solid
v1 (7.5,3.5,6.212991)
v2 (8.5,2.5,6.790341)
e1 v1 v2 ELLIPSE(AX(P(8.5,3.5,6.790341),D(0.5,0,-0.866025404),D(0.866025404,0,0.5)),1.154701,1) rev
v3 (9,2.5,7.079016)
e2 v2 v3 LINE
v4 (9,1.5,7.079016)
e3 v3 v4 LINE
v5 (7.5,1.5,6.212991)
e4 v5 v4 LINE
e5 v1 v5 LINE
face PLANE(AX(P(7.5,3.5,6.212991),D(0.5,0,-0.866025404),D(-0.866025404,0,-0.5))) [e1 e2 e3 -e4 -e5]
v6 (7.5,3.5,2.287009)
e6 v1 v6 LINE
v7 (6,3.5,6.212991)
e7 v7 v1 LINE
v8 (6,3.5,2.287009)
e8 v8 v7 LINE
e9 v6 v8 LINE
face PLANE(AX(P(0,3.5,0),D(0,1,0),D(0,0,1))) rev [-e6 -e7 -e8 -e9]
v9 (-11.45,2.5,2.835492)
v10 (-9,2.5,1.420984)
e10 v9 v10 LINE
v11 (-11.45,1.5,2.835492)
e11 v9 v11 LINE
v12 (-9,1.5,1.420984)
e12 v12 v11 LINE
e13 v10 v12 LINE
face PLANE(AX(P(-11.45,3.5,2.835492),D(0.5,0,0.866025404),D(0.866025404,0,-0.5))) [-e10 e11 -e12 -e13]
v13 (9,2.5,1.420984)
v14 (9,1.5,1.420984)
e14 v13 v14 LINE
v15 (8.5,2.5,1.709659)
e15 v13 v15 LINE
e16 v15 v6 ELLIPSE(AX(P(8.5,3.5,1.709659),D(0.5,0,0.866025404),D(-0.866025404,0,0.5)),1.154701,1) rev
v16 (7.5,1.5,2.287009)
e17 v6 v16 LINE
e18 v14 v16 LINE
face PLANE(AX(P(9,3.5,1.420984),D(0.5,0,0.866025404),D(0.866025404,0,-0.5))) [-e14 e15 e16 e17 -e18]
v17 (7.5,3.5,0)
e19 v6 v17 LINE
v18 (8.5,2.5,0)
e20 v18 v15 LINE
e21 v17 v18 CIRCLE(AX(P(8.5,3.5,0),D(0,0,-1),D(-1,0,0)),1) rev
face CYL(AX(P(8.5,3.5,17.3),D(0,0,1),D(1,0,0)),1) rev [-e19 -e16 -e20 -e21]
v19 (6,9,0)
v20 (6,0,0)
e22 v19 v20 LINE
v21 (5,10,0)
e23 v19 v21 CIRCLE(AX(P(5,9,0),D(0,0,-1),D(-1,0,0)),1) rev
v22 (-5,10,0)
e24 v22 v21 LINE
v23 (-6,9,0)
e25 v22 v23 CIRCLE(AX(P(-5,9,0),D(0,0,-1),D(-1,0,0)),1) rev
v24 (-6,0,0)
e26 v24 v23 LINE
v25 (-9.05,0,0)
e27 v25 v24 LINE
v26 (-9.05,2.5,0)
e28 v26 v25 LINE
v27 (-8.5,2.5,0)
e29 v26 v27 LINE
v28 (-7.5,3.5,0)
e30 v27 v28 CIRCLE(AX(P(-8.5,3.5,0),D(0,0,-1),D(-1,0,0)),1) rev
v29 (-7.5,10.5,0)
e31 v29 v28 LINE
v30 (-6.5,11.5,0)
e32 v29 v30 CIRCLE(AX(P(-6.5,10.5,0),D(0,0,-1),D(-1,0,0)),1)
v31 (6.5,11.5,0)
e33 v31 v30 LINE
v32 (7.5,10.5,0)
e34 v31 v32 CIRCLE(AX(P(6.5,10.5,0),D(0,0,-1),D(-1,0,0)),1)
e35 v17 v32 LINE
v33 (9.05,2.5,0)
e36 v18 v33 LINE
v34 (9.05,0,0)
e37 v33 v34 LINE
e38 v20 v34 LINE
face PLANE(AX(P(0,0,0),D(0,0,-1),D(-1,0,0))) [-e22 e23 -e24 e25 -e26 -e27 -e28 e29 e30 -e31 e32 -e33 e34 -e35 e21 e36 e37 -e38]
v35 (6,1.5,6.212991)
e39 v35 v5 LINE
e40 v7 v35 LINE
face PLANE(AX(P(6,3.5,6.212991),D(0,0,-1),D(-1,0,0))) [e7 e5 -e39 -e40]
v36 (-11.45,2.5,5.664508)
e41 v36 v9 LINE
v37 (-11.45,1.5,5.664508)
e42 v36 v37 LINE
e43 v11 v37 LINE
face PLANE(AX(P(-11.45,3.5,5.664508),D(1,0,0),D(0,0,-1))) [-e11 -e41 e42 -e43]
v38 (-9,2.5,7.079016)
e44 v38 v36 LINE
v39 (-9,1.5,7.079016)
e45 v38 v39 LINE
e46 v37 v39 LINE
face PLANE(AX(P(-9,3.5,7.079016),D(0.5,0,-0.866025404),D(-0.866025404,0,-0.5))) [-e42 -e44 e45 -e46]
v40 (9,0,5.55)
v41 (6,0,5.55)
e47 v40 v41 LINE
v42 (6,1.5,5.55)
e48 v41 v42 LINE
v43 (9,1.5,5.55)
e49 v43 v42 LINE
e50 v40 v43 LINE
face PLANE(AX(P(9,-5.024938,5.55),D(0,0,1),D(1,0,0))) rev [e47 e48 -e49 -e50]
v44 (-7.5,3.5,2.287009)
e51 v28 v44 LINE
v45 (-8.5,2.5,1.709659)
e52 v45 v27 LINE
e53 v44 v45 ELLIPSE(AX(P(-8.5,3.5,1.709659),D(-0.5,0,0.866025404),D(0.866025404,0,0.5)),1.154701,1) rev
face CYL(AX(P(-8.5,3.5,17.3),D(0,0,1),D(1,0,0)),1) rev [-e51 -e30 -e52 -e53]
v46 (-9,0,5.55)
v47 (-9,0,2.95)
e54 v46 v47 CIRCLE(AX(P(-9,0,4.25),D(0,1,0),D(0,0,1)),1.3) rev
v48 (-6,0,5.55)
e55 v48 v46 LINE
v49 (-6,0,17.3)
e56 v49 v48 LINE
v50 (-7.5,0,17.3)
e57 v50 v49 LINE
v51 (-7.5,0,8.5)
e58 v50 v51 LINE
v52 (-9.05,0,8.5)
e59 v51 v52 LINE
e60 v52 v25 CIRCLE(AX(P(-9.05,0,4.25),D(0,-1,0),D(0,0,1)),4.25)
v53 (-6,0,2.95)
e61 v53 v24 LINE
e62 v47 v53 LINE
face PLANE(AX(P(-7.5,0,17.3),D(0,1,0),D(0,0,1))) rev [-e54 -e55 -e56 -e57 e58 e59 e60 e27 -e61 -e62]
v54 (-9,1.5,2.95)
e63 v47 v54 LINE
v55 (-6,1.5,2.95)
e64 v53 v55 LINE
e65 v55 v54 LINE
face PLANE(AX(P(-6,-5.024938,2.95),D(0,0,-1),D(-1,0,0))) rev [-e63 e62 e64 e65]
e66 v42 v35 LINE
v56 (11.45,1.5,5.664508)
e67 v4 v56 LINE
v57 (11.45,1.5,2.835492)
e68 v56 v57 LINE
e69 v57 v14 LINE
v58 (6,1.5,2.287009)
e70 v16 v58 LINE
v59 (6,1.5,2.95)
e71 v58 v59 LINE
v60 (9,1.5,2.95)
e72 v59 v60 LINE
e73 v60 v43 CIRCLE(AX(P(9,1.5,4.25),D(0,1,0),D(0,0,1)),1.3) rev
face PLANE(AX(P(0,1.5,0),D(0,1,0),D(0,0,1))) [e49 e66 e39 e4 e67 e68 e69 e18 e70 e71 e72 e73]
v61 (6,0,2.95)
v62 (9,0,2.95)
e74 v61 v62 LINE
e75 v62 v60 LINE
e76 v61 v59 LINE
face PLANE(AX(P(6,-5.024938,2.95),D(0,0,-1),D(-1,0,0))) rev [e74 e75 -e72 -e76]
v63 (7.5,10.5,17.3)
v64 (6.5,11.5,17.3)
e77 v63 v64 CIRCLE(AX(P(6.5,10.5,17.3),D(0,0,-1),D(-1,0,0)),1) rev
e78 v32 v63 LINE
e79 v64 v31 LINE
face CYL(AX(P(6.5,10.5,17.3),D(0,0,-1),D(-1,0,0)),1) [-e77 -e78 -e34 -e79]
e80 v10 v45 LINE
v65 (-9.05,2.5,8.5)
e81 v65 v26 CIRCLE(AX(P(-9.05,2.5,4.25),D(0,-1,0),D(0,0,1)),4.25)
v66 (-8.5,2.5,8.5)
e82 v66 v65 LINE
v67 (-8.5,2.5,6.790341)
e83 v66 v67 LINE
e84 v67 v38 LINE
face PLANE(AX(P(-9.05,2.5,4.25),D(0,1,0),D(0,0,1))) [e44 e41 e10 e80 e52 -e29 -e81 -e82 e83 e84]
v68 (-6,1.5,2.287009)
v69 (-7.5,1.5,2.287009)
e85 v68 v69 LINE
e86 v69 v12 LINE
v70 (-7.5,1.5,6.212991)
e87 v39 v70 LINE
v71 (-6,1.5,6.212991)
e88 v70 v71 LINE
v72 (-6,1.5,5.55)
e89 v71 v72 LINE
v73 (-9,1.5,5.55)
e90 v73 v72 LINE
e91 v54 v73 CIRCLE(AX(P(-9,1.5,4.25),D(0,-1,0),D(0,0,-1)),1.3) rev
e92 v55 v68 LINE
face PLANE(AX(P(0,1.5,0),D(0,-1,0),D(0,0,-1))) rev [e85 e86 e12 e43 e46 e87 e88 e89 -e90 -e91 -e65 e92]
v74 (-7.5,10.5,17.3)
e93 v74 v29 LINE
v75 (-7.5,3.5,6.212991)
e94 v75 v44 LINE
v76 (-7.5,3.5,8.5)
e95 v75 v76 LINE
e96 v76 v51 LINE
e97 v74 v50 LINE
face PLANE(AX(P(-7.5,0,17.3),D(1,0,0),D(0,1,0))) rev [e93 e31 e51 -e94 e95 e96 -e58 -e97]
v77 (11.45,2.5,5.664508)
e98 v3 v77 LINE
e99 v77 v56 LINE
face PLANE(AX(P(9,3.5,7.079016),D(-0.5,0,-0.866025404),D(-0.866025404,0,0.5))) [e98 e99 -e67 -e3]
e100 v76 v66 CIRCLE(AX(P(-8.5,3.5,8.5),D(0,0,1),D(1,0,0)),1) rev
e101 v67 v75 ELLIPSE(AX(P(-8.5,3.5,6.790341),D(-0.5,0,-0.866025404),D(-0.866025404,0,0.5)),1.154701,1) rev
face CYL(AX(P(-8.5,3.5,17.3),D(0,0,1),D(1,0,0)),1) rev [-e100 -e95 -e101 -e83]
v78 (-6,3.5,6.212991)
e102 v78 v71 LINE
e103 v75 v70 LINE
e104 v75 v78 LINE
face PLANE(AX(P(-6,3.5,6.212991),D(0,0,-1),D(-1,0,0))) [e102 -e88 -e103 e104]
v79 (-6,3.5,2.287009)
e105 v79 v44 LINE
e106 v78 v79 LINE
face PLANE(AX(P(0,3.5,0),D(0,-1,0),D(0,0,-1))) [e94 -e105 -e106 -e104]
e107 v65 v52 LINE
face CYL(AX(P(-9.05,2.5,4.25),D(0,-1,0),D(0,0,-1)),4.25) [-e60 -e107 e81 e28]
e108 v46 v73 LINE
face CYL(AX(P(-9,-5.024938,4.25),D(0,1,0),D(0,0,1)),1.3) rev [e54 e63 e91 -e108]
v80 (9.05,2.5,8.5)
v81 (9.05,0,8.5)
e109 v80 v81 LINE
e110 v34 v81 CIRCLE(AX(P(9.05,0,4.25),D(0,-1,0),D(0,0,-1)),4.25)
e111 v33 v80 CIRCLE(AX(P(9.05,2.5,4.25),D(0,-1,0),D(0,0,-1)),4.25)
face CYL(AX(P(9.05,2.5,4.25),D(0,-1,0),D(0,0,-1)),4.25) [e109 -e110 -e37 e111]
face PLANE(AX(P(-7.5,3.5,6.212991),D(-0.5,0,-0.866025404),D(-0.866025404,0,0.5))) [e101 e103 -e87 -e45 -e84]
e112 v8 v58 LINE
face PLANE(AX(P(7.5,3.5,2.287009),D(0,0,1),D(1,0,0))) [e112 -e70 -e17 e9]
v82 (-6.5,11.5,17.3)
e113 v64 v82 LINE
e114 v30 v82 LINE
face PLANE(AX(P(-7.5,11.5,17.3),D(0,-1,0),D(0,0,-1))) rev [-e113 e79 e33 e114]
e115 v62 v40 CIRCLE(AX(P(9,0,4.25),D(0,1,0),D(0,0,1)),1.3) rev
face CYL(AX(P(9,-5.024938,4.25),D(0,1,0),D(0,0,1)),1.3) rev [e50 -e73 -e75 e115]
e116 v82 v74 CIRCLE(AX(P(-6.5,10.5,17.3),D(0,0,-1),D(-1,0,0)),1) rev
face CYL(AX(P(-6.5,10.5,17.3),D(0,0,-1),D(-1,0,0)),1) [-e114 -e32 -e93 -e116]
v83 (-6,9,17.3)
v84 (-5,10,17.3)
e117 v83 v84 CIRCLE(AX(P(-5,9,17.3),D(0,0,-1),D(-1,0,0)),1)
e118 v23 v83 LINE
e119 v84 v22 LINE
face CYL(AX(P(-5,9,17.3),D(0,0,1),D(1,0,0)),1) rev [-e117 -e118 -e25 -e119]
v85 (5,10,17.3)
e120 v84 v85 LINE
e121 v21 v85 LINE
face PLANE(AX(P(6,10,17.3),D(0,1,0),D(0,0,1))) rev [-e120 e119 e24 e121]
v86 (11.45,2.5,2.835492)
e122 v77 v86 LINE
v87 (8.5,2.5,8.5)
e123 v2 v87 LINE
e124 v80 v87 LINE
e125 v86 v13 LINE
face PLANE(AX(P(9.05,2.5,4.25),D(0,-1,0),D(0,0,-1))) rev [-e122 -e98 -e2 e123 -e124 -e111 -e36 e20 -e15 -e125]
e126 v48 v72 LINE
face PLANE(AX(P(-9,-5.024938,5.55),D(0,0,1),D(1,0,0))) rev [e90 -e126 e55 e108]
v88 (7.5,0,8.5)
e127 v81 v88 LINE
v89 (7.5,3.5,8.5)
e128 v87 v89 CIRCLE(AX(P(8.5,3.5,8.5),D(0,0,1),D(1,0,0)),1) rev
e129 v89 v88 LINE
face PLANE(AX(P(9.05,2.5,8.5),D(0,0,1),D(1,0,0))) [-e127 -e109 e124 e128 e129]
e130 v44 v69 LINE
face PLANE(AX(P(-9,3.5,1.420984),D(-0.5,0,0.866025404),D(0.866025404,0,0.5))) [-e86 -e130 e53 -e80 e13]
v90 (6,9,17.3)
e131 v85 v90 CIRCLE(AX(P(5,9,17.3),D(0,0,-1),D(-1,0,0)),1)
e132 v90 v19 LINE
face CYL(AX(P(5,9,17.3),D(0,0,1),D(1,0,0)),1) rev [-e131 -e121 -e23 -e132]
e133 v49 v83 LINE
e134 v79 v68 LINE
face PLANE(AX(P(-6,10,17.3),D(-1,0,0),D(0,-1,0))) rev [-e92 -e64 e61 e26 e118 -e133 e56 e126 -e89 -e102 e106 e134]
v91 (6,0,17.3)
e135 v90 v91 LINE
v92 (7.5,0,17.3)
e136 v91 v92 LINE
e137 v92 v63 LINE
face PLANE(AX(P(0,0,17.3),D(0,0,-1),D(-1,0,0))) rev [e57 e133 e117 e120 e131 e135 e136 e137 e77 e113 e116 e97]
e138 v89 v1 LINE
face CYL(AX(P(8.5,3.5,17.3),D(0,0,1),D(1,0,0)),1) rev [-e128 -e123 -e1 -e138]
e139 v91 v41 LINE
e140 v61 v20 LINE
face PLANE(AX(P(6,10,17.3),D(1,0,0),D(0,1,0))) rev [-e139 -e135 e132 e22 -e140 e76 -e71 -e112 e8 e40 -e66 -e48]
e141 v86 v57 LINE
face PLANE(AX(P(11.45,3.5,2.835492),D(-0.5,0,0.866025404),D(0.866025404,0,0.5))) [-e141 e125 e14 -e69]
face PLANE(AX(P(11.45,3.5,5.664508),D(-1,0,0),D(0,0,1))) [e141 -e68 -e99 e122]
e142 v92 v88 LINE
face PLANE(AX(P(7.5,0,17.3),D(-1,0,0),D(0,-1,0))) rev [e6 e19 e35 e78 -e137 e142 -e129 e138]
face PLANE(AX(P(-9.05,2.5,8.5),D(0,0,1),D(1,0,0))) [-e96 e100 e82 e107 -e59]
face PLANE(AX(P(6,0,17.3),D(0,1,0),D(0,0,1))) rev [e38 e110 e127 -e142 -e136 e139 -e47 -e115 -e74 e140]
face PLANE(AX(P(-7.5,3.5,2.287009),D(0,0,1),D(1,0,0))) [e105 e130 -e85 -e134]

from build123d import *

# Parameters (mm, degrees)
BOSS_EXTRUDE1_DEPTH     = 17.3
BOSS_EXTRUDE2_DEPTH     = 2.5
CUT_EXTRUDE1_DEPTH      = 2.5
CUT_EXTRUDE2_DEPTH      = 1
CUT_EXTRUDE2_DEPTH_BACK = 1
FILLET1_R               = 1
FILLET2_R               = 1


with BuildPart() as part:
    # Sketch1 → Boss-Extrude1 (new body)
    with BuildSketch(Plane.XY):
        Polygon((6, 0), (7.5, 0), (7.5, 11.5), (-7.5, 11.5), (-7.5, 0), (-6, 0), (-6, 10), (6, 10), align=None)
    extrude(amount=BOSS_EXTRUDE1_DEPTH)

    # Sketch2 → Boss-Extrude2 (add)
    with BuildSketch(Plane.XZ):
        with BuildLine():
            Line((-7.5, 0), (-9.05, 0))
            ThreePointArc((-9.05, 0), (-13.3, 4.25), (-9.05, 8.5))
            Line((-9.05, 8.5), (-7.5, 8.5))
            Line((-7.5, 8.5), (-7.5, 0))
        make_face()
        with BuildLine():
            Line((7.5, 0), (9.05, 0))
            ThreePointArc((9.05, 0), (13.3, 4.25), (9.05, 8.5))
            Line((9.05, 8.5), (7.5, 8.5))
            Line((7.5, 8.5), (7.5, 0))
        make_face()
    extrude(amount=-BOSS_EXTRUDE2_DEPTH)

    # Sketch3 → Cut-Extrude1 (cut)
    with BuildSketch(Plane(origin=(0, 2.5, 0), x_dir=(1, 0, 0), z_dir=(0, 1, 0))):
        with BuildLine():
            Line((6, -2.95), (9, -2.95))
            ThreePointArc((9, -2.95), (10.3, -4.25), (9, -5.55))
            Line((9, -5.55), (6, -5.55))
            Line((6, -5.55), (6, -2.95))
        make_face()
        with BuildLine():
            Line((-6, -2.95), (-9, -2.95))
            ThreePointArc((-9, -2.95), (-10.3, -4.25), (-9, -5.55))
            Line((-9, -5.55), (-6, -5.55))
            Line((-6, -5.55), (-6, -2.95))
        make_face()
    extrude(amount=-CUT_EXTRUDE1_DEPTH, mode=Mode.SUBTRACT)

    # Sketch4 → Cut-Extrude2 (cut, two sides: drawn at the far end of the back side and taken through both)
    with BuildSketch(Plane(origin=(0, 2.5, 0), x_dir=(1, 0, 0), z_dir=(0, 1, 0)).offset(-CUT_EXTRUDE2_DEPTH_BACK)):
        Polygon((9, -1.420983681), (7.5, -2.287009085), (6, -2.287009085), (6, -6.212990915), (7.5, -6.212990915), (9, -7.079016319), (11.45, -5.66450816), (11.45, -2.83549184), align=None)
        Polygon((-6, -6.212990915), (-7.5, -6.212990915), (-9, -7.079016319), (-11.45, -5.66450816), (-11.45, -2.83549184), (-9, -1.420983681), (-7.5, -2.287009085), (-6, -2.287009085), align=None)
    extrude(amount=CUT_EXTRUDE2_DEPTH + CUT_EXTRUDE2_DEPTH_BACK, mode=Mode.SUBTRACT)

    # Fillet1
    fillet1_edges = [part.edges().sort_by_distance(p)[0] for p in [
        (6, 10, 8.65),
        (-6, 10, 8.65),
        (-7.5, 2.5, 1.143504542),
        (7.5, 2.5, 7.356495458),
        (7.5, 2.5, 1.143504542),
        (-7.5, 2.5, 7.356495458),
    ]]
    fillet(fillet1_edges, radius=FILLET1_R - 0.0001)  # a hair under: the kernel refuses the full size

    # Fillet2
    fillet2_edges = [part.edges().sort_by_distance(p)[0] for p in [
        (-7.5, 11.5, 8.65),
        (7.5, 11.5, 8.65),
    ]]
    fillet(fillet2_edges, radius=FILLET2_R)


solid = part.part
